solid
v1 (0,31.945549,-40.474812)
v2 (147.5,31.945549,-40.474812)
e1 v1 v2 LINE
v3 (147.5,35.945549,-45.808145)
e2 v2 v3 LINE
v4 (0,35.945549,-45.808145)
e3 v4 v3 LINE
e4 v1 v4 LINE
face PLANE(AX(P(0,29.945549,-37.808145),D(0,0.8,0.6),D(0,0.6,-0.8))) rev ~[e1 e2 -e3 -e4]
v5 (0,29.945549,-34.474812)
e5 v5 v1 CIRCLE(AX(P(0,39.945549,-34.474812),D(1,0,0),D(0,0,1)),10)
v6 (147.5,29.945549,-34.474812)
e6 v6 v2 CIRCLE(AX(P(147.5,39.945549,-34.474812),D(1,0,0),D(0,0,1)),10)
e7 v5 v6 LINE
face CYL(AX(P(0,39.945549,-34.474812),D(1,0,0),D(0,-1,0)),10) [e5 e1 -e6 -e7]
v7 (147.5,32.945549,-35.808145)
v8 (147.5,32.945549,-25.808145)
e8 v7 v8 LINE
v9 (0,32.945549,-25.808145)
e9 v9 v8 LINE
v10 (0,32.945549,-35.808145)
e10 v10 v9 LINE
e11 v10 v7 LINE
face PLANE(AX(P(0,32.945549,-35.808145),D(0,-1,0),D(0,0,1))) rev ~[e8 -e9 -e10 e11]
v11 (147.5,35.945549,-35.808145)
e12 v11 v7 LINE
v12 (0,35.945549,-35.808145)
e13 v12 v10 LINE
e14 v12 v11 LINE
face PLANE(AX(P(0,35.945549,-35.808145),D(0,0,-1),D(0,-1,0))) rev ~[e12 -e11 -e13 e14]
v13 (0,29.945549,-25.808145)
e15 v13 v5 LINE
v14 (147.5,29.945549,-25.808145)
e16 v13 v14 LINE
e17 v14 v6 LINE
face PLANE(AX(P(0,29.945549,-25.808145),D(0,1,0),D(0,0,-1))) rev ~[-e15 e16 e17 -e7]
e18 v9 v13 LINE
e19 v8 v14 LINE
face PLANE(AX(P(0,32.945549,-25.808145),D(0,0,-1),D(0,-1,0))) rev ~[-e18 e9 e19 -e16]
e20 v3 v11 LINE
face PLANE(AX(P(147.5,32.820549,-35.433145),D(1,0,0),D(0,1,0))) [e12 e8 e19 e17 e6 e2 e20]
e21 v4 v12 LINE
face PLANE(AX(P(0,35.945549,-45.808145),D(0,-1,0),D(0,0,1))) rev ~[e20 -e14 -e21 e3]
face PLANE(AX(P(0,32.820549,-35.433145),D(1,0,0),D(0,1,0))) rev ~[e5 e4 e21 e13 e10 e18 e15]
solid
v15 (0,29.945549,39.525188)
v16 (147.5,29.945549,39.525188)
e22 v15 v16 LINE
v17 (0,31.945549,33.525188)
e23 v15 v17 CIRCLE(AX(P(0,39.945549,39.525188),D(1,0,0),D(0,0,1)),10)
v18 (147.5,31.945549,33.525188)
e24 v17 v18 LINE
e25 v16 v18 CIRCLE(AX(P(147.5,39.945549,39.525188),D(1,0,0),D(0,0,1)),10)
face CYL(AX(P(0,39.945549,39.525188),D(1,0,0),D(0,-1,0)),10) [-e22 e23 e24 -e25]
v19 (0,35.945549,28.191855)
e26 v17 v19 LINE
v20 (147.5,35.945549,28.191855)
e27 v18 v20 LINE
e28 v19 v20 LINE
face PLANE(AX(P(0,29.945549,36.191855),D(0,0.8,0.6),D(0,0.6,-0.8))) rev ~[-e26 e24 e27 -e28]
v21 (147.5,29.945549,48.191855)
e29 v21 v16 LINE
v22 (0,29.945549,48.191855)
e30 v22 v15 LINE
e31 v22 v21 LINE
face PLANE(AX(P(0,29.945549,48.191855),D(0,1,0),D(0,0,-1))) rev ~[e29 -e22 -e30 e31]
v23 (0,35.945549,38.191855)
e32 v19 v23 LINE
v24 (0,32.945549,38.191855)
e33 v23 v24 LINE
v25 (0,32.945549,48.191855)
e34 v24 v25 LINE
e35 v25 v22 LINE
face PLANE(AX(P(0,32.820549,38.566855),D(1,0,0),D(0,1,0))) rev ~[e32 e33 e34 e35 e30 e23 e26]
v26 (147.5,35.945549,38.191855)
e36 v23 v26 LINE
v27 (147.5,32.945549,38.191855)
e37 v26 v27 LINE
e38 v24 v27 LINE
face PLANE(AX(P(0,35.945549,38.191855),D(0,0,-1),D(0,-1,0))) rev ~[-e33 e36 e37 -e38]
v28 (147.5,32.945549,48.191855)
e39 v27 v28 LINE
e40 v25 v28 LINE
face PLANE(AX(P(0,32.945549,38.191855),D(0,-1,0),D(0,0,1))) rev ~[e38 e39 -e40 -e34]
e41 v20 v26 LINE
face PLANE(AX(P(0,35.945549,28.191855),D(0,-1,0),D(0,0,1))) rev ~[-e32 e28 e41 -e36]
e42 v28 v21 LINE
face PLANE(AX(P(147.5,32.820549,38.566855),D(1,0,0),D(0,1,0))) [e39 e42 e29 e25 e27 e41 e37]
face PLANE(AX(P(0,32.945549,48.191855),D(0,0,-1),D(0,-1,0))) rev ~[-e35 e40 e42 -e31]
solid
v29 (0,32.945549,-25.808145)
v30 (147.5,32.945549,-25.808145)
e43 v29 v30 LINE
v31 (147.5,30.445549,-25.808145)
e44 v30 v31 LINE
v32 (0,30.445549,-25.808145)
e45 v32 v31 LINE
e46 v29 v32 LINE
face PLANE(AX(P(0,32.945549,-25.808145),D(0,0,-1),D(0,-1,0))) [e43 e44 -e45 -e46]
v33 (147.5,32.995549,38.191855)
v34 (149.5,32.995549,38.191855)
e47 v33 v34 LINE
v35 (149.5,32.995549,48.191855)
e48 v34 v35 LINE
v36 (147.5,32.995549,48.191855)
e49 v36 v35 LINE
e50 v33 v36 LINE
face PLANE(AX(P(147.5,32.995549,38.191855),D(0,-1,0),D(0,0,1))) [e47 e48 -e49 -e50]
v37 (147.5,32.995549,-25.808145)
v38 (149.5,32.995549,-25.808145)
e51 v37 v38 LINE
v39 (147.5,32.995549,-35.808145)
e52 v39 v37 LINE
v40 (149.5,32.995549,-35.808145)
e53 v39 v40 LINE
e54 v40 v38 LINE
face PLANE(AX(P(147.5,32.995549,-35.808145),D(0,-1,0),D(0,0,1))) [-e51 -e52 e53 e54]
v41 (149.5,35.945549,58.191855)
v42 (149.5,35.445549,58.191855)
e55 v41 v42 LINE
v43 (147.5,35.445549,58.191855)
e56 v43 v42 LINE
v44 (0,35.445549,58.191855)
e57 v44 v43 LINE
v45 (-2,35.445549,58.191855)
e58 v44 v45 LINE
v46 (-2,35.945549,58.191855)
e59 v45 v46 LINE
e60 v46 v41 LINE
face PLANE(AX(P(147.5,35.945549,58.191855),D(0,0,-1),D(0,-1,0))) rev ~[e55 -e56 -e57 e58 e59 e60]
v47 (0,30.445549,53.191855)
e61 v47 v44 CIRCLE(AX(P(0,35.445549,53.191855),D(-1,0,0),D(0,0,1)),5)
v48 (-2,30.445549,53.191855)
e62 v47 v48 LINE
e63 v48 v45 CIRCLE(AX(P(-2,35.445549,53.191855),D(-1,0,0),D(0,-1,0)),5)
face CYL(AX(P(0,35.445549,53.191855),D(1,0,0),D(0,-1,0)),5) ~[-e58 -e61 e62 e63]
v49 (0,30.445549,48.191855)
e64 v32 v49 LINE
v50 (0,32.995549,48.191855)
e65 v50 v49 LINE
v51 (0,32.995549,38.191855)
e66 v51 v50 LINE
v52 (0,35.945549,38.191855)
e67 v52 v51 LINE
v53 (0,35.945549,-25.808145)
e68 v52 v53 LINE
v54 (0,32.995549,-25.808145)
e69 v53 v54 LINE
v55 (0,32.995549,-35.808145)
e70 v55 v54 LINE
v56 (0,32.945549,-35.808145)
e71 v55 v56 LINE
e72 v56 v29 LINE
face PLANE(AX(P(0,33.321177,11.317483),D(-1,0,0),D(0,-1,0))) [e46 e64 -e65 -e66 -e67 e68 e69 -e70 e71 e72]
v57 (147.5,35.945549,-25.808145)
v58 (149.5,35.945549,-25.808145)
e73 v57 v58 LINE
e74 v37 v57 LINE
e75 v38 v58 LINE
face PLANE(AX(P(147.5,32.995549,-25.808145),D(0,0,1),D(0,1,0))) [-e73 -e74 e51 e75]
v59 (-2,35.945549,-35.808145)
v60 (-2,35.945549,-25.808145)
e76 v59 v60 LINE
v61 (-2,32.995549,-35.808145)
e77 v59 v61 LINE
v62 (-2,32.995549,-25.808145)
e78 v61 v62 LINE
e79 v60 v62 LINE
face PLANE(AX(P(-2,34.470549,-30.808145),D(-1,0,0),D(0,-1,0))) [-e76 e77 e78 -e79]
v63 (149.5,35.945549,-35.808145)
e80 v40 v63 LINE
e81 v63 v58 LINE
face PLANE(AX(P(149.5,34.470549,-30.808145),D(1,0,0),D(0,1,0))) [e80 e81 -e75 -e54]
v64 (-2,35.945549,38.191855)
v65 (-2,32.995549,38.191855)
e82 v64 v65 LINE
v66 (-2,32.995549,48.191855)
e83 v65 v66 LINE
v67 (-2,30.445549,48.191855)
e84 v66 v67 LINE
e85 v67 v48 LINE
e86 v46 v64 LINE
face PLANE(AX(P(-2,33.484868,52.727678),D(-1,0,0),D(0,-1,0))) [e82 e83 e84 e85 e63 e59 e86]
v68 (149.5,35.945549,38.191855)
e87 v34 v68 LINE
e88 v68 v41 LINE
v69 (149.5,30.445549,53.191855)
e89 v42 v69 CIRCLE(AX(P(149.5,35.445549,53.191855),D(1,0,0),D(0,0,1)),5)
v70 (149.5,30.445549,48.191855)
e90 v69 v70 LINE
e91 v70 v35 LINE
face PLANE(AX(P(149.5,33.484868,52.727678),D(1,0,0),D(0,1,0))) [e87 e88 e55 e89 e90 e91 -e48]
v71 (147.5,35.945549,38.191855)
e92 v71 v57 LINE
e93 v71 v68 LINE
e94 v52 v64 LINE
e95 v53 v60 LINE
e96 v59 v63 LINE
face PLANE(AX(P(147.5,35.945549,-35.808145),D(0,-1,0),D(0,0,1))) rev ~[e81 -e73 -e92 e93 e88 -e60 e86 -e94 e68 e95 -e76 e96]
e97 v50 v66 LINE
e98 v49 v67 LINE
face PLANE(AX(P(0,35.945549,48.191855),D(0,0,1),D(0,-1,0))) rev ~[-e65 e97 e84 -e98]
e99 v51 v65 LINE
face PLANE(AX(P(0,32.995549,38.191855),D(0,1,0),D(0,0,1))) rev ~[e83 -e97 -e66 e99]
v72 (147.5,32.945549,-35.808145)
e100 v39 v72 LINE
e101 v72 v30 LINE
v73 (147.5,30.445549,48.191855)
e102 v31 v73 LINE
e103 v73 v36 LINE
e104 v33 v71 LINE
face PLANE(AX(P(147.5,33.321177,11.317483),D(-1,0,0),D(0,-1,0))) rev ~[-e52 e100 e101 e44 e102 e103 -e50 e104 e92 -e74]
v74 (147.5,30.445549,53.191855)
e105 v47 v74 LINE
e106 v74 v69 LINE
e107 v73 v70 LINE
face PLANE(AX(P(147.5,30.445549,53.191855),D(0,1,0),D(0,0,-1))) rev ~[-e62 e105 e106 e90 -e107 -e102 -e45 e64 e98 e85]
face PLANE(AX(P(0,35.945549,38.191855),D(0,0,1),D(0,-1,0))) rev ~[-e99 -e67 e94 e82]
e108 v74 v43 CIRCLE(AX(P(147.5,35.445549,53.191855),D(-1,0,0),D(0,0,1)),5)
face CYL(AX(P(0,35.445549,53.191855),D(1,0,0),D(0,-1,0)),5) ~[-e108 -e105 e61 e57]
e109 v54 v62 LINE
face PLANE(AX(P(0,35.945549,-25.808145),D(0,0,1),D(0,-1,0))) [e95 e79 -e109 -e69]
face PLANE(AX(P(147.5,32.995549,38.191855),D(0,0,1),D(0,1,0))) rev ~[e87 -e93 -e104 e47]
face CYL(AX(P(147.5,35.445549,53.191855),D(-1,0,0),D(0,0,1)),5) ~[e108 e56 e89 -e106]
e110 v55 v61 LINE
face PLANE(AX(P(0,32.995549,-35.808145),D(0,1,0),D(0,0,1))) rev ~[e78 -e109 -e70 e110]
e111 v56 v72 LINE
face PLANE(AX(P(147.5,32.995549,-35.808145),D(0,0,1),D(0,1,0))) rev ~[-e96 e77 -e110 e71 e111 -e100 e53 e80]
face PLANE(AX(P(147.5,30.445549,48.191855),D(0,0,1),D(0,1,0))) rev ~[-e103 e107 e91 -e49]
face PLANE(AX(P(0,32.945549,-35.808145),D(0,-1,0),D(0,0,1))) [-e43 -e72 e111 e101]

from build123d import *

# Parameters (mm, degrees)
F1_DEPTH  = 147.5
F2_R      = 10
F2_2_R    = 10
F4_DEPTH  = 147.5
F5_W      = 2.95
F5_H      = 10
F6_DEPTH  = 2
F7_W      = 2.95
F7_H      = 10
F8_DEPTH  = 2
F9_R      = 5
F11_DEPTH = 2
F13_DEPTH = 2


with BuildPart() as f1:
    # F0 (on Right) → F1 (new body)
    with BuildSketch(Plane.YZ):
        Polygon((35.9455486238, 28.1918546259), (35.9455486238, 38.1918546259), (32.9455486238, 38.1918546259), (32.9455486238, 48.1918546259), (29.9455486238, 48.1918546259), (29.9455486238, 36.1918546259), align=None)
    extrude(amount=F1_DEPTH)

    # F2
    f2_edges = [f1.edges().sort_by_distance(p)[0] for p in [
        (73.75, 29.945549, 36.191855),
    ]]
    fillet(f2_edges, radius=F2_R)


with BuildPart() as f1b:
    # F0 (on Right) → F1, piece 2 (new body)
    with BuildSketch(Plane.YZ):
        Polygon((35.9455486238, -45.8081453741), (35.9455486238, -35.8081453741), (32.9455486238, -35.8081453741), (32.9455486238, -25.8081453741), (29.9455486238, -25.8081453741), (29.9455486238, -37.8081453741), align=None)
    extrude(amount=F1_DEPTH)

    # F2#2
    f2_2_edges = [f1b.edges().sort_by_distance(p)[0] for p in [
        (73.75, 29.945549, -37.808145),
    ]]
    fillet(f2_2_edges, radius=F2_2_R)


with BuildPart() as f4:
    # F3 (on face) → F4 (new body)
    with BuildSketch(Plane(origin=(0, 0, 0), x_dir=(0, -1, 0), z_dir=(-1, 0, 0))):
        Polygon((-30.4455486238, 58.1918546259), (-35.9455486238, 58.1918546259), (-35.9455486238, -35.8081453741), (-32.9455486238, -35.8081453741), (-32.9455486238, -25.8081453741), (-30.4455486238, -25.8081453741), align=None)
    extrude(amount=-F4_DEPTH)

    # F5 (on face) → F6 (join)
    with BuildSketch(Plane(origin=(0, 0, 0), x_dir=(0, -1, 0), z_dir=(-1, 0, 0))):
        with Locations((-34.4705486238, 43.1918546259)):
            Rectangle(F5_W, F5_H)
        with Locations((-34.4705486238, -30.8081453741)):
            Rectangle(F5_W, F5_H)
    extrude(amount=F6_DEPTH)

    # F7 (on face) → F8 (join)
    with BuildSketch(Plane.YZ.offset(147.5)):
        with Locations((34.4705486238, 43.1918546259)):
            Rectangle(F7_W, F7_H)
        with Locations((34.4705486238, -30.8081453741)):
            Rectangle(F7_W, F7_H)
    extrude(amount=F8_DEPTH)

    # F9
    f9_edges = [f4.edges().sort_by_distance(p)[0] for p in [
        (73.75, 30.445549, 58.191855),
    ]]
    fillet(f9_edges, radius=F9_R)

    # F10 (on face) → F11 (join)
    with BuildSketch(Plane(origin=(0, 0, 0), x_dir=(0, -1, 0), z_dir=(-1, 0, 0))):
        with BuildLine():
            Line((-35.9455486238, 48.1918546259), (-32.9955486238, 48.1918546259))
            Line((-32.9955486238, 48.1918546259), (-30.4455486238, 48.1918546259))
            Line((-30.4455486238, 48.1918546259), (-30.4455486238, 53.1918546259))
            ThreePointArc((-30.4455486238, 53.1918546259), (-31.9100147179, 56.7273885319), (-35.4455486238, 58.1918546259))
            Line((-35.4455486238, 58.1918546259), (-35.9455486238, 58.1918546259))
            Line((-35.9455486238, 58.1918546259), (-35.9455486238, 48.1918546259))
        make_face()
    extrude(amount=F11_DEPTH)

    # F12 (on face) → F13 (join)
    with BuildSketch(Plane.YZ.offset(147.5)):
        with BuildLine():
            Line((30.4455486238, 48.1918546259), (32.9955486238, 48.1918546259))
            Line((32.9955486238, 48.1918546259), (35.9455486238, 48.1918546259))
            Line((35.9455486238, 48.1918546259), (35.9455486238, 58.1918546259))
            Line((35.9455486238, 58.1918546259), (35.4455486238, 58.1918546259))
            ThreePointArc((35.4455486238, 58.1918546259), (31.9100147179, 56.7273885319), (30.4455486238, 53.1918546259))
            Line((30.4455486238, 53.1918546259), (30.4455486238, 48.1918546259))
        make_face()
    extrude(amount=F13_DEPTH)


solid = Compound([f1.part, f1b.part, f4.part])
